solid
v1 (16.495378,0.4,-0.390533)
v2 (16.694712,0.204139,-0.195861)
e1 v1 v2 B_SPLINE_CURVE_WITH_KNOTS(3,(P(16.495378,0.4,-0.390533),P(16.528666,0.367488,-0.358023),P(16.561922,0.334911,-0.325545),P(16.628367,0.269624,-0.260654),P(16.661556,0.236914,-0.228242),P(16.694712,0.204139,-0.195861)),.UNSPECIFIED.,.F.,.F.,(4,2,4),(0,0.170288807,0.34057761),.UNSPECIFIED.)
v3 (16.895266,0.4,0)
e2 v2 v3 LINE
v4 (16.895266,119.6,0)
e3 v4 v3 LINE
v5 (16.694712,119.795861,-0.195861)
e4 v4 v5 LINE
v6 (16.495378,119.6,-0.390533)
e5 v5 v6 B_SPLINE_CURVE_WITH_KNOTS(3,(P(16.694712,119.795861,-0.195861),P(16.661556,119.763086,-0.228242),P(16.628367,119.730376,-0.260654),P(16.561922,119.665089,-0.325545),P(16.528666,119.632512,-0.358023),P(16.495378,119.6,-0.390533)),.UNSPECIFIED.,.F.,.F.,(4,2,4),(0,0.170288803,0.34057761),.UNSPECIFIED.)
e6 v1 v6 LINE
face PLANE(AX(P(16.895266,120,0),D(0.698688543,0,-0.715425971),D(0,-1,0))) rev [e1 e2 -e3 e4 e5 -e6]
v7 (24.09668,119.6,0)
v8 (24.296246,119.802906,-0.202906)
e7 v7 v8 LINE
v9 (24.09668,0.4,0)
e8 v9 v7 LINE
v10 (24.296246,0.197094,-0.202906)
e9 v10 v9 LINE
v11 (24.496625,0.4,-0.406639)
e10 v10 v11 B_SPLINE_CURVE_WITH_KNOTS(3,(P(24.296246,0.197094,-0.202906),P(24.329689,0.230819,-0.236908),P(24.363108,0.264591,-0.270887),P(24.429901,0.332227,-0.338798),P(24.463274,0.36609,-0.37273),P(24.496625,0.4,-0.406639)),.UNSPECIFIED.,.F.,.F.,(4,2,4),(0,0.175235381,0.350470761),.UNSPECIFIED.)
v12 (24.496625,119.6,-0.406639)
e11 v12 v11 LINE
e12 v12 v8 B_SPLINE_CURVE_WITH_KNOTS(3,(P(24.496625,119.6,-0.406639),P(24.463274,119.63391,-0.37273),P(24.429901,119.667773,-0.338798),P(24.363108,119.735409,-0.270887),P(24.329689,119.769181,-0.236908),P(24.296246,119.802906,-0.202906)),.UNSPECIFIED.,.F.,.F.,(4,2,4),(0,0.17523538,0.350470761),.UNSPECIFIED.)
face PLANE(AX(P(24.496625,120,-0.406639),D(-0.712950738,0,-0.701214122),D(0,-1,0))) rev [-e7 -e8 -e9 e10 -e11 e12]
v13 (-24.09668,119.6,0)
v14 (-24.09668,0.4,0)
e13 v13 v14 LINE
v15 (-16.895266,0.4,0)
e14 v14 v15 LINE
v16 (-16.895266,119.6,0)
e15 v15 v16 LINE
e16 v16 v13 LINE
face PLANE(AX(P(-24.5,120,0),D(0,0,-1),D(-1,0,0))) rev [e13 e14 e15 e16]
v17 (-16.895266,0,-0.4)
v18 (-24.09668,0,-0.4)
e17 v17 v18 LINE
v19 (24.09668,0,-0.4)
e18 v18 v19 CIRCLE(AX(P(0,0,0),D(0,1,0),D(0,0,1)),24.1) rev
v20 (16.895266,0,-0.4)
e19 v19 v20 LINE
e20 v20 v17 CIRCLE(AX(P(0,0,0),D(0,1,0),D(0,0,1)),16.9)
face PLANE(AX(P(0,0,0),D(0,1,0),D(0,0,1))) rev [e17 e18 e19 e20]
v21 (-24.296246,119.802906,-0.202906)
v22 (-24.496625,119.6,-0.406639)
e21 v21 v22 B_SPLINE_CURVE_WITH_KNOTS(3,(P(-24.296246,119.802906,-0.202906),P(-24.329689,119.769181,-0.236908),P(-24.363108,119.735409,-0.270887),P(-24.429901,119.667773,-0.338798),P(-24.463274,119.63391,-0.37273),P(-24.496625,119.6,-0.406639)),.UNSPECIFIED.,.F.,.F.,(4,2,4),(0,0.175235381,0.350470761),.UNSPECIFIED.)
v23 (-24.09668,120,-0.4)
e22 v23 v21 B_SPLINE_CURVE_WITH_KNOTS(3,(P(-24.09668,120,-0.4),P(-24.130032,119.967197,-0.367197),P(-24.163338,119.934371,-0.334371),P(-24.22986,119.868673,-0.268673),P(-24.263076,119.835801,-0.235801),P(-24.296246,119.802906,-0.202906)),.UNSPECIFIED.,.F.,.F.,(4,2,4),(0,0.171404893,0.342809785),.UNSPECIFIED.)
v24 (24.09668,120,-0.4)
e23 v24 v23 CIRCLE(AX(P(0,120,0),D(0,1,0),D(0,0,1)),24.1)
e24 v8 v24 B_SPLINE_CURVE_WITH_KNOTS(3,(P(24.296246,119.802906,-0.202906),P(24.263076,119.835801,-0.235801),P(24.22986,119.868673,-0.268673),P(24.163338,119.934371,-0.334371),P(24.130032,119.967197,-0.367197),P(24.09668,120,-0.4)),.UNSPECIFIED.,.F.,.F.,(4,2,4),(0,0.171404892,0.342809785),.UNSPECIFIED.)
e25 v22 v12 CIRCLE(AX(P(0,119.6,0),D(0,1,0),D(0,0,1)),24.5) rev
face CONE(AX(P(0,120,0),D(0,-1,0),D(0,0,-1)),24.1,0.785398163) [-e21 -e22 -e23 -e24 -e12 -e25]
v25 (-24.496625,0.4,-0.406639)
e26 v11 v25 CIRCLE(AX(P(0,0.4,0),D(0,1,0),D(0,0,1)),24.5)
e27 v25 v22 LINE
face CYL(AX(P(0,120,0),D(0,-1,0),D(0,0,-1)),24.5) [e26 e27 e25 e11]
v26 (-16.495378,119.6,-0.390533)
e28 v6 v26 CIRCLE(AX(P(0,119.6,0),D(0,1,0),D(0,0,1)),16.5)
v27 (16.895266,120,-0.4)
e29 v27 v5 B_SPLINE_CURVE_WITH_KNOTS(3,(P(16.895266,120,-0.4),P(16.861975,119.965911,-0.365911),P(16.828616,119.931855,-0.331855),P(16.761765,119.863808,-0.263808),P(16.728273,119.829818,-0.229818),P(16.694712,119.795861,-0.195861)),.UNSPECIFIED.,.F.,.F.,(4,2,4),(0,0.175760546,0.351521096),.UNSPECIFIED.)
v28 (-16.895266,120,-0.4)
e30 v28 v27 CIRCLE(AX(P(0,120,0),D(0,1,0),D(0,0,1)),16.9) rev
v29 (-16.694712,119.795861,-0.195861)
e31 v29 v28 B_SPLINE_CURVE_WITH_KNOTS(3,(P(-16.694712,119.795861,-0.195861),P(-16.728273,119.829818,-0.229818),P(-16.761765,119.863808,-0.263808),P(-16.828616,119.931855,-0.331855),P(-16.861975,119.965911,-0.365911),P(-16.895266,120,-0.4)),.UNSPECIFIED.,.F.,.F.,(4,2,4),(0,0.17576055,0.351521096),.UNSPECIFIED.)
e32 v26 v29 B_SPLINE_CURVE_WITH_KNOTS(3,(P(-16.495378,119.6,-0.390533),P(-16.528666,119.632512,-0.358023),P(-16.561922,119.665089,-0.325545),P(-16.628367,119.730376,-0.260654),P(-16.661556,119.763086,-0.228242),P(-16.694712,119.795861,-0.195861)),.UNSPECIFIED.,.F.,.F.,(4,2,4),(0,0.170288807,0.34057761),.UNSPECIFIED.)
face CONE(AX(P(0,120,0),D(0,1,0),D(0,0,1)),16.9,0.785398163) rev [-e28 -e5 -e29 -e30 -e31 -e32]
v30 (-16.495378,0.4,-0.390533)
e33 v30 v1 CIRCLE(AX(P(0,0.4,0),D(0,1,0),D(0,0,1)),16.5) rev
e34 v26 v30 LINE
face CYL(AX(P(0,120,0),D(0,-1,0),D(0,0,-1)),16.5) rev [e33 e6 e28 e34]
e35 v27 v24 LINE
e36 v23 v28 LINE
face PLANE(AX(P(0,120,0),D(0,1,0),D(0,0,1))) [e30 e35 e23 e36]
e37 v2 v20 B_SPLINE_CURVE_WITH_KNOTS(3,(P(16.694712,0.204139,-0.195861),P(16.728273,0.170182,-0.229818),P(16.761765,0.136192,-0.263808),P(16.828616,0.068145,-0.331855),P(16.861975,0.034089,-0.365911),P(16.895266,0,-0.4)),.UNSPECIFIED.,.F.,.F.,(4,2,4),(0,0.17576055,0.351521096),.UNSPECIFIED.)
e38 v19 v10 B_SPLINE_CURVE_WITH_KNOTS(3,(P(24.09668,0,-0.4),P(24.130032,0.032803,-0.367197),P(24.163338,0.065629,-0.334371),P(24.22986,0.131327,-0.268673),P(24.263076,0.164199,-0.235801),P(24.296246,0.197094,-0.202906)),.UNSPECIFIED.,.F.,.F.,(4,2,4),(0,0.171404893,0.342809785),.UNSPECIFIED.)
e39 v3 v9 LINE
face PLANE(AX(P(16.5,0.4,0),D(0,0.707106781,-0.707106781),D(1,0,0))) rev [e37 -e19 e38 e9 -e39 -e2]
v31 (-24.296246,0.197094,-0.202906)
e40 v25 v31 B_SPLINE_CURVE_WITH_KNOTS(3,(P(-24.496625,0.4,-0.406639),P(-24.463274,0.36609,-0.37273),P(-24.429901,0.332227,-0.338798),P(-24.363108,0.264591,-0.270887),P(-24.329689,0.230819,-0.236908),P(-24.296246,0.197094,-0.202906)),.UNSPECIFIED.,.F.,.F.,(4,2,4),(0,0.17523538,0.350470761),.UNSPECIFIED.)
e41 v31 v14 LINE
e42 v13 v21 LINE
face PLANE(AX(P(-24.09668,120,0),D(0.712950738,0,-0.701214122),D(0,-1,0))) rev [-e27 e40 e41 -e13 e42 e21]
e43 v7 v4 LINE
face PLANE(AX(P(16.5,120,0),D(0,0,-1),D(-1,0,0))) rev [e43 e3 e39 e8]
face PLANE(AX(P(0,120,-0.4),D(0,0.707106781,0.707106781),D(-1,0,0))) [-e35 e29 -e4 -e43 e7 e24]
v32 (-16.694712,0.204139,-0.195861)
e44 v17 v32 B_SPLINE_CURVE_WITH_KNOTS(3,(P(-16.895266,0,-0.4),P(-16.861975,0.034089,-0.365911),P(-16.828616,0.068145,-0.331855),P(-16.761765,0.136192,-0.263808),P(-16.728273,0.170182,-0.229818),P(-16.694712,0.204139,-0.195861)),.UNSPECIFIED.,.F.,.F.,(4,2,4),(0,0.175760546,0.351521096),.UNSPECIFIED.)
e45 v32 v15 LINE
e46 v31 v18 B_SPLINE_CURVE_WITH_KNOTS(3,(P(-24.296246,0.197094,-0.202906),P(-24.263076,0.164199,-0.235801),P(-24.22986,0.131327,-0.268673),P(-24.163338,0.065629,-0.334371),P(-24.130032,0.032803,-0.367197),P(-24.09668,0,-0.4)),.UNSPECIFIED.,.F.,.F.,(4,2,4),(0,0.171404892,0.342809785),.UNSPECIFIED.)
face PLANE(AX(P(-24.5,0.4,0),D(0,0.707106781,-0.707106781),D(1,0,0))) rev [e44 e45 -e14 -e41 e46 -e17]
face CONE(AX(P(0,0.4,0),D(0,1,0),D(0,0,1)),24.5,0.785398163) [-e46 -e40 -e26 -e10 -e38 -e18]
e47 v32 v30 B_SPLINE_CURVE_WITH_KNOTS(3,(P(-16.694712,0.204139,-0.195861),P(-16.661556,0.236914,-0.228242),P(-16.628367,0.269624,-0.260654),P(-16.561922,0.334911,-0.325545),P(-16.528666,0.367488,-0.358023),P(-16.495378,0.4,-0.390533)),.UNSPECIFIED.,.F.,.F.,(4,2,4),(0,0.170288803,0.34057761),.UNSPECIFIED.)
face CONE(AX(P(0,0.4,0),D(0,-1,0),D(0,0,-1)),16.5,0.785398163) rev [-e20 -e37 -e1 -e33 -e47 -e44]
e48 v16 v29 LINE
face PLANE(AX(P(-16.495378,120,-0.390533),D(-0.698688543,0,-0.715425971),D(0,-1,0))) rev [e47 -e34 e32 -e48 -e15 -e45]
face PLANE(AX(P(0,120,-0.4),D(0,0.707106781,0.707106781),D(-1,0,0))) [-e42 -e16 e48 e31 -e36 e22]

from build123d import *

# Parameters (mm, degrees)
EXTRUDE_1_DEPTH = 120
CHAMFER_2_SIZE  = 0.4


with BuildPart() as part:
    # 草图1 → 凸台-拉伸1 (new body)
    with BuildSketch(Plane(origin=(0, 0, 0), x_dir=(1, 0, 0), z_dir=(0, 1, 0))):
        with BuildLine():
            Line((-24.5, 0), (-16.5, 0))
            ThreePointArc((-16.5, 0), (0, 16.5), (16.5, 0))
            Line((16.5, 0), (24.5, 0))
            ThreePointArc((24.5, 0), (0, 24.5), (-24.5, 0))
        make_face()
    extrude(amount=EXTRUDE_1_DEPTH)

    # 倒角1
    # the kernel refuses this chamfer: 0.4 mm, written as the material it takes off along each edge
    with BuildSketch(Plane(origin=(15.471326805, 120, 0), x_dir=(0, -0.9996219169112966, 0.027495876610585543), z_dir=(1, 0, 0)), Plane(origin=(-25.528673195, 120, 0), x_dir=(0, -0.9996219169112966, 0.027495876610585543), z_dir=(1, 0, 0))) as chamfer_1_piece_1:
        with BuildLine():
            Line((0.411469278, 0), (-0.022618862, 0.410847117))
            Line((-0.022618862, 0.410847117), (-0.030615837, 0.41062715))
            ThreePointArc((-0.030615837, 0.41062715), (-0.013651691, 0.205359132), (-0.007996975, -0.000219967))
            Line((-0.007996975, -0.000219967), (0.000219967, -0.007996975))
            ThreePointArc((0.000219967, -0.007996975), (0.205799066, -0.00234226), (0.411689245, -0.007996975))
            Line((0.411689245, -0.007996975), (0.411469278, 0))
        make_face()
    extrude(amount=10.05734639, mode=Mode.SUBTRACT)
    with BuildSketch(Plane(origin=(15.471326805, 0, 0), x_dir=(0, 0.9996219169112968, 0.02749587661058639), z_dir=(1, 0, 0)), Plane(origin=(-25.528673195, 0, 0), x_dir=(0, 0.9996219169112968, 0.02749587661058639), z_dir=(1, 0, 0))) as chamfer_1_piece_2:
        with BuildLine():
            Line((0.411469278, 0), (-0.022618862, -0.410847117))
            Line((-0.022618862, -0.410847117), (-0.030615837, -0.41062715))
            ThreePointArc((-0.030615837, -0.41062715), (-0.013651691, -0.205359132), (-0.007996975, 0.000219967))
            Line((-0.007996975, 0.000219967), (0.000219967, 0.007996975))
            ThreePointArc((0.000219967, 0.007996975), (0.205799066, 0.00234226), (0.411689245, 0.007996975))
            Line((0.411689245, 0.007996975), (0.411469278, 0))
        make_face()
    extrude(amount=10.05734639, mode=Mode.SUBTRACT)
    with BuildSketch(Plane(origin=(24.5, -1.045299528, 0), x_dir=(-0.9996215998180249, 0, 0.0275074022265361), z_dir=(0, 1, 0))) as chamfer_1_piece_3:
        with BuildLine():
            Line((0.414696078, 0), (-0.019340993, -0.417672243))
            Line((-0.019340993, -0.417672243), (-0.027340517, -0.417584944))
            ThreePointArc((-0.027340517, -0.417584944), (-0.012856137, -0.208775648), (-0.007996973, 0.000220059))
            Line((-0.007996973, 0.000220059), (0.000220059, 0.007996973))
            ThreePointArc((0.000220059, 0.007996973), (0.207411207, 0.002295525), (0.414916137, 0.007996973))
            Line((0.414916137, 0.007996973), (0.414696078, 0))
        make_face()
    extrude(amount=122.090599055, mode=Mode.SUBTRACT)
    with BuildSketch(Plane(origin=(16.5, -1.017165076, 0), x_dir=(-0.039969745571149635, 0, -0.9992008904314376), z_dir=(0, 1, 0))) as chamfer_1_piece_4:
        with BuildLine():
            Line((0.402032829, 0), (-0.027426276, -0.405940594))
            Line((-0.027426276, -0.405940594), (-0.035419883, -0.405620836))
            ThreePointArc((-0.035419883, -0.405620836), (-0.016121703, -0.20287395), (-0.007993607, 0.000319758))
            Line((-0.007993607, 0.000319758), (0.000319758, 0.007993607))
            ThreePointArc((0.000319758, 0.007993607), (0.201049453, 0.001188032), (0.4021633, 0.007998936))
            Line((0.4021633, 0.007998936), (0.402032829, 0))
        make_face()
    extrude(amount=122.034330152, mode=Mode.SUBTRACT)
    with BuildSketch(Plane(origin=(-16.5, -1.017165076, 0), x_dir=(-0.9996224657663016, 0, 0.02747591554978717), z_dir=(0, 1, 0))) as chamfer_1_piece_5:
        with BuildLine():
            Line((0.40686603, 0), (-0.027100476, -0.401118387))
            Line((-0.027100476, -0.401118387), (-0.035090013, -0.400709363))
            ThreePointArc((-0.035090013, -0.400709363), (-0.014737795, -0.200512073), (-0.00799698, 0.000219807))
            Line((-0.00799698, 0.000219807), (0.000219807, 0.00799698))
            ThreePointArc((0.000219807, 0.00799698), (0.203499246, 0.002409582), (0.407085838, 0.00799698))
            Line((0.407085838, 0.00799698), (0.40686603, 0))
        make_face()
    extrude(amount=122.034330152, mode=Mode.SUBTRACT)
    with BuildSketch(Plane(origin=(-24.5, -1.045299528, 0), x_dir=(0.9996215998180249, 0, 0.02750740222653502), z_dir=(0, 1, 0))) as chamfer_1_piece_6:
        with BuildLine():
            Line((0.414696078, 0), (-0.019340993, 0.417672243))
            Line((-0.019340993, 0.417672243), (-0.027340517, 0.417584944))
            ThreePointArc((-0.027340517, 0.417584944), (-0.012856137, 0.208775648), (-0.007996973, -0.000220059))
            Line((-0.007996973, -0.000220059), (0.000220059, -0.007996973))
            ThreePointArc((0.000220059, -0.007996973), (0.207411207, -0.002295525), (0.414916137, -0.007996973))
            Line((0.414916137, -0.007996973), (0.414696078, 0))
        make_face()
    extrude(amount=122.090599055, mode=Mode.SUBTRACT)

    # 倒角2
    chamfer_2_edges = [part.edges().sort_by_distance(p)[0] for p in [
        (0, 0, -24.5),
        (0, 0, -16.5),
        (0, 120, -16.5),
        (0, 120, -24.5),
    ]]
    chamfer(chamfer_2_edges, length=CHAMFER_2_SIZE)


solid = part.part
